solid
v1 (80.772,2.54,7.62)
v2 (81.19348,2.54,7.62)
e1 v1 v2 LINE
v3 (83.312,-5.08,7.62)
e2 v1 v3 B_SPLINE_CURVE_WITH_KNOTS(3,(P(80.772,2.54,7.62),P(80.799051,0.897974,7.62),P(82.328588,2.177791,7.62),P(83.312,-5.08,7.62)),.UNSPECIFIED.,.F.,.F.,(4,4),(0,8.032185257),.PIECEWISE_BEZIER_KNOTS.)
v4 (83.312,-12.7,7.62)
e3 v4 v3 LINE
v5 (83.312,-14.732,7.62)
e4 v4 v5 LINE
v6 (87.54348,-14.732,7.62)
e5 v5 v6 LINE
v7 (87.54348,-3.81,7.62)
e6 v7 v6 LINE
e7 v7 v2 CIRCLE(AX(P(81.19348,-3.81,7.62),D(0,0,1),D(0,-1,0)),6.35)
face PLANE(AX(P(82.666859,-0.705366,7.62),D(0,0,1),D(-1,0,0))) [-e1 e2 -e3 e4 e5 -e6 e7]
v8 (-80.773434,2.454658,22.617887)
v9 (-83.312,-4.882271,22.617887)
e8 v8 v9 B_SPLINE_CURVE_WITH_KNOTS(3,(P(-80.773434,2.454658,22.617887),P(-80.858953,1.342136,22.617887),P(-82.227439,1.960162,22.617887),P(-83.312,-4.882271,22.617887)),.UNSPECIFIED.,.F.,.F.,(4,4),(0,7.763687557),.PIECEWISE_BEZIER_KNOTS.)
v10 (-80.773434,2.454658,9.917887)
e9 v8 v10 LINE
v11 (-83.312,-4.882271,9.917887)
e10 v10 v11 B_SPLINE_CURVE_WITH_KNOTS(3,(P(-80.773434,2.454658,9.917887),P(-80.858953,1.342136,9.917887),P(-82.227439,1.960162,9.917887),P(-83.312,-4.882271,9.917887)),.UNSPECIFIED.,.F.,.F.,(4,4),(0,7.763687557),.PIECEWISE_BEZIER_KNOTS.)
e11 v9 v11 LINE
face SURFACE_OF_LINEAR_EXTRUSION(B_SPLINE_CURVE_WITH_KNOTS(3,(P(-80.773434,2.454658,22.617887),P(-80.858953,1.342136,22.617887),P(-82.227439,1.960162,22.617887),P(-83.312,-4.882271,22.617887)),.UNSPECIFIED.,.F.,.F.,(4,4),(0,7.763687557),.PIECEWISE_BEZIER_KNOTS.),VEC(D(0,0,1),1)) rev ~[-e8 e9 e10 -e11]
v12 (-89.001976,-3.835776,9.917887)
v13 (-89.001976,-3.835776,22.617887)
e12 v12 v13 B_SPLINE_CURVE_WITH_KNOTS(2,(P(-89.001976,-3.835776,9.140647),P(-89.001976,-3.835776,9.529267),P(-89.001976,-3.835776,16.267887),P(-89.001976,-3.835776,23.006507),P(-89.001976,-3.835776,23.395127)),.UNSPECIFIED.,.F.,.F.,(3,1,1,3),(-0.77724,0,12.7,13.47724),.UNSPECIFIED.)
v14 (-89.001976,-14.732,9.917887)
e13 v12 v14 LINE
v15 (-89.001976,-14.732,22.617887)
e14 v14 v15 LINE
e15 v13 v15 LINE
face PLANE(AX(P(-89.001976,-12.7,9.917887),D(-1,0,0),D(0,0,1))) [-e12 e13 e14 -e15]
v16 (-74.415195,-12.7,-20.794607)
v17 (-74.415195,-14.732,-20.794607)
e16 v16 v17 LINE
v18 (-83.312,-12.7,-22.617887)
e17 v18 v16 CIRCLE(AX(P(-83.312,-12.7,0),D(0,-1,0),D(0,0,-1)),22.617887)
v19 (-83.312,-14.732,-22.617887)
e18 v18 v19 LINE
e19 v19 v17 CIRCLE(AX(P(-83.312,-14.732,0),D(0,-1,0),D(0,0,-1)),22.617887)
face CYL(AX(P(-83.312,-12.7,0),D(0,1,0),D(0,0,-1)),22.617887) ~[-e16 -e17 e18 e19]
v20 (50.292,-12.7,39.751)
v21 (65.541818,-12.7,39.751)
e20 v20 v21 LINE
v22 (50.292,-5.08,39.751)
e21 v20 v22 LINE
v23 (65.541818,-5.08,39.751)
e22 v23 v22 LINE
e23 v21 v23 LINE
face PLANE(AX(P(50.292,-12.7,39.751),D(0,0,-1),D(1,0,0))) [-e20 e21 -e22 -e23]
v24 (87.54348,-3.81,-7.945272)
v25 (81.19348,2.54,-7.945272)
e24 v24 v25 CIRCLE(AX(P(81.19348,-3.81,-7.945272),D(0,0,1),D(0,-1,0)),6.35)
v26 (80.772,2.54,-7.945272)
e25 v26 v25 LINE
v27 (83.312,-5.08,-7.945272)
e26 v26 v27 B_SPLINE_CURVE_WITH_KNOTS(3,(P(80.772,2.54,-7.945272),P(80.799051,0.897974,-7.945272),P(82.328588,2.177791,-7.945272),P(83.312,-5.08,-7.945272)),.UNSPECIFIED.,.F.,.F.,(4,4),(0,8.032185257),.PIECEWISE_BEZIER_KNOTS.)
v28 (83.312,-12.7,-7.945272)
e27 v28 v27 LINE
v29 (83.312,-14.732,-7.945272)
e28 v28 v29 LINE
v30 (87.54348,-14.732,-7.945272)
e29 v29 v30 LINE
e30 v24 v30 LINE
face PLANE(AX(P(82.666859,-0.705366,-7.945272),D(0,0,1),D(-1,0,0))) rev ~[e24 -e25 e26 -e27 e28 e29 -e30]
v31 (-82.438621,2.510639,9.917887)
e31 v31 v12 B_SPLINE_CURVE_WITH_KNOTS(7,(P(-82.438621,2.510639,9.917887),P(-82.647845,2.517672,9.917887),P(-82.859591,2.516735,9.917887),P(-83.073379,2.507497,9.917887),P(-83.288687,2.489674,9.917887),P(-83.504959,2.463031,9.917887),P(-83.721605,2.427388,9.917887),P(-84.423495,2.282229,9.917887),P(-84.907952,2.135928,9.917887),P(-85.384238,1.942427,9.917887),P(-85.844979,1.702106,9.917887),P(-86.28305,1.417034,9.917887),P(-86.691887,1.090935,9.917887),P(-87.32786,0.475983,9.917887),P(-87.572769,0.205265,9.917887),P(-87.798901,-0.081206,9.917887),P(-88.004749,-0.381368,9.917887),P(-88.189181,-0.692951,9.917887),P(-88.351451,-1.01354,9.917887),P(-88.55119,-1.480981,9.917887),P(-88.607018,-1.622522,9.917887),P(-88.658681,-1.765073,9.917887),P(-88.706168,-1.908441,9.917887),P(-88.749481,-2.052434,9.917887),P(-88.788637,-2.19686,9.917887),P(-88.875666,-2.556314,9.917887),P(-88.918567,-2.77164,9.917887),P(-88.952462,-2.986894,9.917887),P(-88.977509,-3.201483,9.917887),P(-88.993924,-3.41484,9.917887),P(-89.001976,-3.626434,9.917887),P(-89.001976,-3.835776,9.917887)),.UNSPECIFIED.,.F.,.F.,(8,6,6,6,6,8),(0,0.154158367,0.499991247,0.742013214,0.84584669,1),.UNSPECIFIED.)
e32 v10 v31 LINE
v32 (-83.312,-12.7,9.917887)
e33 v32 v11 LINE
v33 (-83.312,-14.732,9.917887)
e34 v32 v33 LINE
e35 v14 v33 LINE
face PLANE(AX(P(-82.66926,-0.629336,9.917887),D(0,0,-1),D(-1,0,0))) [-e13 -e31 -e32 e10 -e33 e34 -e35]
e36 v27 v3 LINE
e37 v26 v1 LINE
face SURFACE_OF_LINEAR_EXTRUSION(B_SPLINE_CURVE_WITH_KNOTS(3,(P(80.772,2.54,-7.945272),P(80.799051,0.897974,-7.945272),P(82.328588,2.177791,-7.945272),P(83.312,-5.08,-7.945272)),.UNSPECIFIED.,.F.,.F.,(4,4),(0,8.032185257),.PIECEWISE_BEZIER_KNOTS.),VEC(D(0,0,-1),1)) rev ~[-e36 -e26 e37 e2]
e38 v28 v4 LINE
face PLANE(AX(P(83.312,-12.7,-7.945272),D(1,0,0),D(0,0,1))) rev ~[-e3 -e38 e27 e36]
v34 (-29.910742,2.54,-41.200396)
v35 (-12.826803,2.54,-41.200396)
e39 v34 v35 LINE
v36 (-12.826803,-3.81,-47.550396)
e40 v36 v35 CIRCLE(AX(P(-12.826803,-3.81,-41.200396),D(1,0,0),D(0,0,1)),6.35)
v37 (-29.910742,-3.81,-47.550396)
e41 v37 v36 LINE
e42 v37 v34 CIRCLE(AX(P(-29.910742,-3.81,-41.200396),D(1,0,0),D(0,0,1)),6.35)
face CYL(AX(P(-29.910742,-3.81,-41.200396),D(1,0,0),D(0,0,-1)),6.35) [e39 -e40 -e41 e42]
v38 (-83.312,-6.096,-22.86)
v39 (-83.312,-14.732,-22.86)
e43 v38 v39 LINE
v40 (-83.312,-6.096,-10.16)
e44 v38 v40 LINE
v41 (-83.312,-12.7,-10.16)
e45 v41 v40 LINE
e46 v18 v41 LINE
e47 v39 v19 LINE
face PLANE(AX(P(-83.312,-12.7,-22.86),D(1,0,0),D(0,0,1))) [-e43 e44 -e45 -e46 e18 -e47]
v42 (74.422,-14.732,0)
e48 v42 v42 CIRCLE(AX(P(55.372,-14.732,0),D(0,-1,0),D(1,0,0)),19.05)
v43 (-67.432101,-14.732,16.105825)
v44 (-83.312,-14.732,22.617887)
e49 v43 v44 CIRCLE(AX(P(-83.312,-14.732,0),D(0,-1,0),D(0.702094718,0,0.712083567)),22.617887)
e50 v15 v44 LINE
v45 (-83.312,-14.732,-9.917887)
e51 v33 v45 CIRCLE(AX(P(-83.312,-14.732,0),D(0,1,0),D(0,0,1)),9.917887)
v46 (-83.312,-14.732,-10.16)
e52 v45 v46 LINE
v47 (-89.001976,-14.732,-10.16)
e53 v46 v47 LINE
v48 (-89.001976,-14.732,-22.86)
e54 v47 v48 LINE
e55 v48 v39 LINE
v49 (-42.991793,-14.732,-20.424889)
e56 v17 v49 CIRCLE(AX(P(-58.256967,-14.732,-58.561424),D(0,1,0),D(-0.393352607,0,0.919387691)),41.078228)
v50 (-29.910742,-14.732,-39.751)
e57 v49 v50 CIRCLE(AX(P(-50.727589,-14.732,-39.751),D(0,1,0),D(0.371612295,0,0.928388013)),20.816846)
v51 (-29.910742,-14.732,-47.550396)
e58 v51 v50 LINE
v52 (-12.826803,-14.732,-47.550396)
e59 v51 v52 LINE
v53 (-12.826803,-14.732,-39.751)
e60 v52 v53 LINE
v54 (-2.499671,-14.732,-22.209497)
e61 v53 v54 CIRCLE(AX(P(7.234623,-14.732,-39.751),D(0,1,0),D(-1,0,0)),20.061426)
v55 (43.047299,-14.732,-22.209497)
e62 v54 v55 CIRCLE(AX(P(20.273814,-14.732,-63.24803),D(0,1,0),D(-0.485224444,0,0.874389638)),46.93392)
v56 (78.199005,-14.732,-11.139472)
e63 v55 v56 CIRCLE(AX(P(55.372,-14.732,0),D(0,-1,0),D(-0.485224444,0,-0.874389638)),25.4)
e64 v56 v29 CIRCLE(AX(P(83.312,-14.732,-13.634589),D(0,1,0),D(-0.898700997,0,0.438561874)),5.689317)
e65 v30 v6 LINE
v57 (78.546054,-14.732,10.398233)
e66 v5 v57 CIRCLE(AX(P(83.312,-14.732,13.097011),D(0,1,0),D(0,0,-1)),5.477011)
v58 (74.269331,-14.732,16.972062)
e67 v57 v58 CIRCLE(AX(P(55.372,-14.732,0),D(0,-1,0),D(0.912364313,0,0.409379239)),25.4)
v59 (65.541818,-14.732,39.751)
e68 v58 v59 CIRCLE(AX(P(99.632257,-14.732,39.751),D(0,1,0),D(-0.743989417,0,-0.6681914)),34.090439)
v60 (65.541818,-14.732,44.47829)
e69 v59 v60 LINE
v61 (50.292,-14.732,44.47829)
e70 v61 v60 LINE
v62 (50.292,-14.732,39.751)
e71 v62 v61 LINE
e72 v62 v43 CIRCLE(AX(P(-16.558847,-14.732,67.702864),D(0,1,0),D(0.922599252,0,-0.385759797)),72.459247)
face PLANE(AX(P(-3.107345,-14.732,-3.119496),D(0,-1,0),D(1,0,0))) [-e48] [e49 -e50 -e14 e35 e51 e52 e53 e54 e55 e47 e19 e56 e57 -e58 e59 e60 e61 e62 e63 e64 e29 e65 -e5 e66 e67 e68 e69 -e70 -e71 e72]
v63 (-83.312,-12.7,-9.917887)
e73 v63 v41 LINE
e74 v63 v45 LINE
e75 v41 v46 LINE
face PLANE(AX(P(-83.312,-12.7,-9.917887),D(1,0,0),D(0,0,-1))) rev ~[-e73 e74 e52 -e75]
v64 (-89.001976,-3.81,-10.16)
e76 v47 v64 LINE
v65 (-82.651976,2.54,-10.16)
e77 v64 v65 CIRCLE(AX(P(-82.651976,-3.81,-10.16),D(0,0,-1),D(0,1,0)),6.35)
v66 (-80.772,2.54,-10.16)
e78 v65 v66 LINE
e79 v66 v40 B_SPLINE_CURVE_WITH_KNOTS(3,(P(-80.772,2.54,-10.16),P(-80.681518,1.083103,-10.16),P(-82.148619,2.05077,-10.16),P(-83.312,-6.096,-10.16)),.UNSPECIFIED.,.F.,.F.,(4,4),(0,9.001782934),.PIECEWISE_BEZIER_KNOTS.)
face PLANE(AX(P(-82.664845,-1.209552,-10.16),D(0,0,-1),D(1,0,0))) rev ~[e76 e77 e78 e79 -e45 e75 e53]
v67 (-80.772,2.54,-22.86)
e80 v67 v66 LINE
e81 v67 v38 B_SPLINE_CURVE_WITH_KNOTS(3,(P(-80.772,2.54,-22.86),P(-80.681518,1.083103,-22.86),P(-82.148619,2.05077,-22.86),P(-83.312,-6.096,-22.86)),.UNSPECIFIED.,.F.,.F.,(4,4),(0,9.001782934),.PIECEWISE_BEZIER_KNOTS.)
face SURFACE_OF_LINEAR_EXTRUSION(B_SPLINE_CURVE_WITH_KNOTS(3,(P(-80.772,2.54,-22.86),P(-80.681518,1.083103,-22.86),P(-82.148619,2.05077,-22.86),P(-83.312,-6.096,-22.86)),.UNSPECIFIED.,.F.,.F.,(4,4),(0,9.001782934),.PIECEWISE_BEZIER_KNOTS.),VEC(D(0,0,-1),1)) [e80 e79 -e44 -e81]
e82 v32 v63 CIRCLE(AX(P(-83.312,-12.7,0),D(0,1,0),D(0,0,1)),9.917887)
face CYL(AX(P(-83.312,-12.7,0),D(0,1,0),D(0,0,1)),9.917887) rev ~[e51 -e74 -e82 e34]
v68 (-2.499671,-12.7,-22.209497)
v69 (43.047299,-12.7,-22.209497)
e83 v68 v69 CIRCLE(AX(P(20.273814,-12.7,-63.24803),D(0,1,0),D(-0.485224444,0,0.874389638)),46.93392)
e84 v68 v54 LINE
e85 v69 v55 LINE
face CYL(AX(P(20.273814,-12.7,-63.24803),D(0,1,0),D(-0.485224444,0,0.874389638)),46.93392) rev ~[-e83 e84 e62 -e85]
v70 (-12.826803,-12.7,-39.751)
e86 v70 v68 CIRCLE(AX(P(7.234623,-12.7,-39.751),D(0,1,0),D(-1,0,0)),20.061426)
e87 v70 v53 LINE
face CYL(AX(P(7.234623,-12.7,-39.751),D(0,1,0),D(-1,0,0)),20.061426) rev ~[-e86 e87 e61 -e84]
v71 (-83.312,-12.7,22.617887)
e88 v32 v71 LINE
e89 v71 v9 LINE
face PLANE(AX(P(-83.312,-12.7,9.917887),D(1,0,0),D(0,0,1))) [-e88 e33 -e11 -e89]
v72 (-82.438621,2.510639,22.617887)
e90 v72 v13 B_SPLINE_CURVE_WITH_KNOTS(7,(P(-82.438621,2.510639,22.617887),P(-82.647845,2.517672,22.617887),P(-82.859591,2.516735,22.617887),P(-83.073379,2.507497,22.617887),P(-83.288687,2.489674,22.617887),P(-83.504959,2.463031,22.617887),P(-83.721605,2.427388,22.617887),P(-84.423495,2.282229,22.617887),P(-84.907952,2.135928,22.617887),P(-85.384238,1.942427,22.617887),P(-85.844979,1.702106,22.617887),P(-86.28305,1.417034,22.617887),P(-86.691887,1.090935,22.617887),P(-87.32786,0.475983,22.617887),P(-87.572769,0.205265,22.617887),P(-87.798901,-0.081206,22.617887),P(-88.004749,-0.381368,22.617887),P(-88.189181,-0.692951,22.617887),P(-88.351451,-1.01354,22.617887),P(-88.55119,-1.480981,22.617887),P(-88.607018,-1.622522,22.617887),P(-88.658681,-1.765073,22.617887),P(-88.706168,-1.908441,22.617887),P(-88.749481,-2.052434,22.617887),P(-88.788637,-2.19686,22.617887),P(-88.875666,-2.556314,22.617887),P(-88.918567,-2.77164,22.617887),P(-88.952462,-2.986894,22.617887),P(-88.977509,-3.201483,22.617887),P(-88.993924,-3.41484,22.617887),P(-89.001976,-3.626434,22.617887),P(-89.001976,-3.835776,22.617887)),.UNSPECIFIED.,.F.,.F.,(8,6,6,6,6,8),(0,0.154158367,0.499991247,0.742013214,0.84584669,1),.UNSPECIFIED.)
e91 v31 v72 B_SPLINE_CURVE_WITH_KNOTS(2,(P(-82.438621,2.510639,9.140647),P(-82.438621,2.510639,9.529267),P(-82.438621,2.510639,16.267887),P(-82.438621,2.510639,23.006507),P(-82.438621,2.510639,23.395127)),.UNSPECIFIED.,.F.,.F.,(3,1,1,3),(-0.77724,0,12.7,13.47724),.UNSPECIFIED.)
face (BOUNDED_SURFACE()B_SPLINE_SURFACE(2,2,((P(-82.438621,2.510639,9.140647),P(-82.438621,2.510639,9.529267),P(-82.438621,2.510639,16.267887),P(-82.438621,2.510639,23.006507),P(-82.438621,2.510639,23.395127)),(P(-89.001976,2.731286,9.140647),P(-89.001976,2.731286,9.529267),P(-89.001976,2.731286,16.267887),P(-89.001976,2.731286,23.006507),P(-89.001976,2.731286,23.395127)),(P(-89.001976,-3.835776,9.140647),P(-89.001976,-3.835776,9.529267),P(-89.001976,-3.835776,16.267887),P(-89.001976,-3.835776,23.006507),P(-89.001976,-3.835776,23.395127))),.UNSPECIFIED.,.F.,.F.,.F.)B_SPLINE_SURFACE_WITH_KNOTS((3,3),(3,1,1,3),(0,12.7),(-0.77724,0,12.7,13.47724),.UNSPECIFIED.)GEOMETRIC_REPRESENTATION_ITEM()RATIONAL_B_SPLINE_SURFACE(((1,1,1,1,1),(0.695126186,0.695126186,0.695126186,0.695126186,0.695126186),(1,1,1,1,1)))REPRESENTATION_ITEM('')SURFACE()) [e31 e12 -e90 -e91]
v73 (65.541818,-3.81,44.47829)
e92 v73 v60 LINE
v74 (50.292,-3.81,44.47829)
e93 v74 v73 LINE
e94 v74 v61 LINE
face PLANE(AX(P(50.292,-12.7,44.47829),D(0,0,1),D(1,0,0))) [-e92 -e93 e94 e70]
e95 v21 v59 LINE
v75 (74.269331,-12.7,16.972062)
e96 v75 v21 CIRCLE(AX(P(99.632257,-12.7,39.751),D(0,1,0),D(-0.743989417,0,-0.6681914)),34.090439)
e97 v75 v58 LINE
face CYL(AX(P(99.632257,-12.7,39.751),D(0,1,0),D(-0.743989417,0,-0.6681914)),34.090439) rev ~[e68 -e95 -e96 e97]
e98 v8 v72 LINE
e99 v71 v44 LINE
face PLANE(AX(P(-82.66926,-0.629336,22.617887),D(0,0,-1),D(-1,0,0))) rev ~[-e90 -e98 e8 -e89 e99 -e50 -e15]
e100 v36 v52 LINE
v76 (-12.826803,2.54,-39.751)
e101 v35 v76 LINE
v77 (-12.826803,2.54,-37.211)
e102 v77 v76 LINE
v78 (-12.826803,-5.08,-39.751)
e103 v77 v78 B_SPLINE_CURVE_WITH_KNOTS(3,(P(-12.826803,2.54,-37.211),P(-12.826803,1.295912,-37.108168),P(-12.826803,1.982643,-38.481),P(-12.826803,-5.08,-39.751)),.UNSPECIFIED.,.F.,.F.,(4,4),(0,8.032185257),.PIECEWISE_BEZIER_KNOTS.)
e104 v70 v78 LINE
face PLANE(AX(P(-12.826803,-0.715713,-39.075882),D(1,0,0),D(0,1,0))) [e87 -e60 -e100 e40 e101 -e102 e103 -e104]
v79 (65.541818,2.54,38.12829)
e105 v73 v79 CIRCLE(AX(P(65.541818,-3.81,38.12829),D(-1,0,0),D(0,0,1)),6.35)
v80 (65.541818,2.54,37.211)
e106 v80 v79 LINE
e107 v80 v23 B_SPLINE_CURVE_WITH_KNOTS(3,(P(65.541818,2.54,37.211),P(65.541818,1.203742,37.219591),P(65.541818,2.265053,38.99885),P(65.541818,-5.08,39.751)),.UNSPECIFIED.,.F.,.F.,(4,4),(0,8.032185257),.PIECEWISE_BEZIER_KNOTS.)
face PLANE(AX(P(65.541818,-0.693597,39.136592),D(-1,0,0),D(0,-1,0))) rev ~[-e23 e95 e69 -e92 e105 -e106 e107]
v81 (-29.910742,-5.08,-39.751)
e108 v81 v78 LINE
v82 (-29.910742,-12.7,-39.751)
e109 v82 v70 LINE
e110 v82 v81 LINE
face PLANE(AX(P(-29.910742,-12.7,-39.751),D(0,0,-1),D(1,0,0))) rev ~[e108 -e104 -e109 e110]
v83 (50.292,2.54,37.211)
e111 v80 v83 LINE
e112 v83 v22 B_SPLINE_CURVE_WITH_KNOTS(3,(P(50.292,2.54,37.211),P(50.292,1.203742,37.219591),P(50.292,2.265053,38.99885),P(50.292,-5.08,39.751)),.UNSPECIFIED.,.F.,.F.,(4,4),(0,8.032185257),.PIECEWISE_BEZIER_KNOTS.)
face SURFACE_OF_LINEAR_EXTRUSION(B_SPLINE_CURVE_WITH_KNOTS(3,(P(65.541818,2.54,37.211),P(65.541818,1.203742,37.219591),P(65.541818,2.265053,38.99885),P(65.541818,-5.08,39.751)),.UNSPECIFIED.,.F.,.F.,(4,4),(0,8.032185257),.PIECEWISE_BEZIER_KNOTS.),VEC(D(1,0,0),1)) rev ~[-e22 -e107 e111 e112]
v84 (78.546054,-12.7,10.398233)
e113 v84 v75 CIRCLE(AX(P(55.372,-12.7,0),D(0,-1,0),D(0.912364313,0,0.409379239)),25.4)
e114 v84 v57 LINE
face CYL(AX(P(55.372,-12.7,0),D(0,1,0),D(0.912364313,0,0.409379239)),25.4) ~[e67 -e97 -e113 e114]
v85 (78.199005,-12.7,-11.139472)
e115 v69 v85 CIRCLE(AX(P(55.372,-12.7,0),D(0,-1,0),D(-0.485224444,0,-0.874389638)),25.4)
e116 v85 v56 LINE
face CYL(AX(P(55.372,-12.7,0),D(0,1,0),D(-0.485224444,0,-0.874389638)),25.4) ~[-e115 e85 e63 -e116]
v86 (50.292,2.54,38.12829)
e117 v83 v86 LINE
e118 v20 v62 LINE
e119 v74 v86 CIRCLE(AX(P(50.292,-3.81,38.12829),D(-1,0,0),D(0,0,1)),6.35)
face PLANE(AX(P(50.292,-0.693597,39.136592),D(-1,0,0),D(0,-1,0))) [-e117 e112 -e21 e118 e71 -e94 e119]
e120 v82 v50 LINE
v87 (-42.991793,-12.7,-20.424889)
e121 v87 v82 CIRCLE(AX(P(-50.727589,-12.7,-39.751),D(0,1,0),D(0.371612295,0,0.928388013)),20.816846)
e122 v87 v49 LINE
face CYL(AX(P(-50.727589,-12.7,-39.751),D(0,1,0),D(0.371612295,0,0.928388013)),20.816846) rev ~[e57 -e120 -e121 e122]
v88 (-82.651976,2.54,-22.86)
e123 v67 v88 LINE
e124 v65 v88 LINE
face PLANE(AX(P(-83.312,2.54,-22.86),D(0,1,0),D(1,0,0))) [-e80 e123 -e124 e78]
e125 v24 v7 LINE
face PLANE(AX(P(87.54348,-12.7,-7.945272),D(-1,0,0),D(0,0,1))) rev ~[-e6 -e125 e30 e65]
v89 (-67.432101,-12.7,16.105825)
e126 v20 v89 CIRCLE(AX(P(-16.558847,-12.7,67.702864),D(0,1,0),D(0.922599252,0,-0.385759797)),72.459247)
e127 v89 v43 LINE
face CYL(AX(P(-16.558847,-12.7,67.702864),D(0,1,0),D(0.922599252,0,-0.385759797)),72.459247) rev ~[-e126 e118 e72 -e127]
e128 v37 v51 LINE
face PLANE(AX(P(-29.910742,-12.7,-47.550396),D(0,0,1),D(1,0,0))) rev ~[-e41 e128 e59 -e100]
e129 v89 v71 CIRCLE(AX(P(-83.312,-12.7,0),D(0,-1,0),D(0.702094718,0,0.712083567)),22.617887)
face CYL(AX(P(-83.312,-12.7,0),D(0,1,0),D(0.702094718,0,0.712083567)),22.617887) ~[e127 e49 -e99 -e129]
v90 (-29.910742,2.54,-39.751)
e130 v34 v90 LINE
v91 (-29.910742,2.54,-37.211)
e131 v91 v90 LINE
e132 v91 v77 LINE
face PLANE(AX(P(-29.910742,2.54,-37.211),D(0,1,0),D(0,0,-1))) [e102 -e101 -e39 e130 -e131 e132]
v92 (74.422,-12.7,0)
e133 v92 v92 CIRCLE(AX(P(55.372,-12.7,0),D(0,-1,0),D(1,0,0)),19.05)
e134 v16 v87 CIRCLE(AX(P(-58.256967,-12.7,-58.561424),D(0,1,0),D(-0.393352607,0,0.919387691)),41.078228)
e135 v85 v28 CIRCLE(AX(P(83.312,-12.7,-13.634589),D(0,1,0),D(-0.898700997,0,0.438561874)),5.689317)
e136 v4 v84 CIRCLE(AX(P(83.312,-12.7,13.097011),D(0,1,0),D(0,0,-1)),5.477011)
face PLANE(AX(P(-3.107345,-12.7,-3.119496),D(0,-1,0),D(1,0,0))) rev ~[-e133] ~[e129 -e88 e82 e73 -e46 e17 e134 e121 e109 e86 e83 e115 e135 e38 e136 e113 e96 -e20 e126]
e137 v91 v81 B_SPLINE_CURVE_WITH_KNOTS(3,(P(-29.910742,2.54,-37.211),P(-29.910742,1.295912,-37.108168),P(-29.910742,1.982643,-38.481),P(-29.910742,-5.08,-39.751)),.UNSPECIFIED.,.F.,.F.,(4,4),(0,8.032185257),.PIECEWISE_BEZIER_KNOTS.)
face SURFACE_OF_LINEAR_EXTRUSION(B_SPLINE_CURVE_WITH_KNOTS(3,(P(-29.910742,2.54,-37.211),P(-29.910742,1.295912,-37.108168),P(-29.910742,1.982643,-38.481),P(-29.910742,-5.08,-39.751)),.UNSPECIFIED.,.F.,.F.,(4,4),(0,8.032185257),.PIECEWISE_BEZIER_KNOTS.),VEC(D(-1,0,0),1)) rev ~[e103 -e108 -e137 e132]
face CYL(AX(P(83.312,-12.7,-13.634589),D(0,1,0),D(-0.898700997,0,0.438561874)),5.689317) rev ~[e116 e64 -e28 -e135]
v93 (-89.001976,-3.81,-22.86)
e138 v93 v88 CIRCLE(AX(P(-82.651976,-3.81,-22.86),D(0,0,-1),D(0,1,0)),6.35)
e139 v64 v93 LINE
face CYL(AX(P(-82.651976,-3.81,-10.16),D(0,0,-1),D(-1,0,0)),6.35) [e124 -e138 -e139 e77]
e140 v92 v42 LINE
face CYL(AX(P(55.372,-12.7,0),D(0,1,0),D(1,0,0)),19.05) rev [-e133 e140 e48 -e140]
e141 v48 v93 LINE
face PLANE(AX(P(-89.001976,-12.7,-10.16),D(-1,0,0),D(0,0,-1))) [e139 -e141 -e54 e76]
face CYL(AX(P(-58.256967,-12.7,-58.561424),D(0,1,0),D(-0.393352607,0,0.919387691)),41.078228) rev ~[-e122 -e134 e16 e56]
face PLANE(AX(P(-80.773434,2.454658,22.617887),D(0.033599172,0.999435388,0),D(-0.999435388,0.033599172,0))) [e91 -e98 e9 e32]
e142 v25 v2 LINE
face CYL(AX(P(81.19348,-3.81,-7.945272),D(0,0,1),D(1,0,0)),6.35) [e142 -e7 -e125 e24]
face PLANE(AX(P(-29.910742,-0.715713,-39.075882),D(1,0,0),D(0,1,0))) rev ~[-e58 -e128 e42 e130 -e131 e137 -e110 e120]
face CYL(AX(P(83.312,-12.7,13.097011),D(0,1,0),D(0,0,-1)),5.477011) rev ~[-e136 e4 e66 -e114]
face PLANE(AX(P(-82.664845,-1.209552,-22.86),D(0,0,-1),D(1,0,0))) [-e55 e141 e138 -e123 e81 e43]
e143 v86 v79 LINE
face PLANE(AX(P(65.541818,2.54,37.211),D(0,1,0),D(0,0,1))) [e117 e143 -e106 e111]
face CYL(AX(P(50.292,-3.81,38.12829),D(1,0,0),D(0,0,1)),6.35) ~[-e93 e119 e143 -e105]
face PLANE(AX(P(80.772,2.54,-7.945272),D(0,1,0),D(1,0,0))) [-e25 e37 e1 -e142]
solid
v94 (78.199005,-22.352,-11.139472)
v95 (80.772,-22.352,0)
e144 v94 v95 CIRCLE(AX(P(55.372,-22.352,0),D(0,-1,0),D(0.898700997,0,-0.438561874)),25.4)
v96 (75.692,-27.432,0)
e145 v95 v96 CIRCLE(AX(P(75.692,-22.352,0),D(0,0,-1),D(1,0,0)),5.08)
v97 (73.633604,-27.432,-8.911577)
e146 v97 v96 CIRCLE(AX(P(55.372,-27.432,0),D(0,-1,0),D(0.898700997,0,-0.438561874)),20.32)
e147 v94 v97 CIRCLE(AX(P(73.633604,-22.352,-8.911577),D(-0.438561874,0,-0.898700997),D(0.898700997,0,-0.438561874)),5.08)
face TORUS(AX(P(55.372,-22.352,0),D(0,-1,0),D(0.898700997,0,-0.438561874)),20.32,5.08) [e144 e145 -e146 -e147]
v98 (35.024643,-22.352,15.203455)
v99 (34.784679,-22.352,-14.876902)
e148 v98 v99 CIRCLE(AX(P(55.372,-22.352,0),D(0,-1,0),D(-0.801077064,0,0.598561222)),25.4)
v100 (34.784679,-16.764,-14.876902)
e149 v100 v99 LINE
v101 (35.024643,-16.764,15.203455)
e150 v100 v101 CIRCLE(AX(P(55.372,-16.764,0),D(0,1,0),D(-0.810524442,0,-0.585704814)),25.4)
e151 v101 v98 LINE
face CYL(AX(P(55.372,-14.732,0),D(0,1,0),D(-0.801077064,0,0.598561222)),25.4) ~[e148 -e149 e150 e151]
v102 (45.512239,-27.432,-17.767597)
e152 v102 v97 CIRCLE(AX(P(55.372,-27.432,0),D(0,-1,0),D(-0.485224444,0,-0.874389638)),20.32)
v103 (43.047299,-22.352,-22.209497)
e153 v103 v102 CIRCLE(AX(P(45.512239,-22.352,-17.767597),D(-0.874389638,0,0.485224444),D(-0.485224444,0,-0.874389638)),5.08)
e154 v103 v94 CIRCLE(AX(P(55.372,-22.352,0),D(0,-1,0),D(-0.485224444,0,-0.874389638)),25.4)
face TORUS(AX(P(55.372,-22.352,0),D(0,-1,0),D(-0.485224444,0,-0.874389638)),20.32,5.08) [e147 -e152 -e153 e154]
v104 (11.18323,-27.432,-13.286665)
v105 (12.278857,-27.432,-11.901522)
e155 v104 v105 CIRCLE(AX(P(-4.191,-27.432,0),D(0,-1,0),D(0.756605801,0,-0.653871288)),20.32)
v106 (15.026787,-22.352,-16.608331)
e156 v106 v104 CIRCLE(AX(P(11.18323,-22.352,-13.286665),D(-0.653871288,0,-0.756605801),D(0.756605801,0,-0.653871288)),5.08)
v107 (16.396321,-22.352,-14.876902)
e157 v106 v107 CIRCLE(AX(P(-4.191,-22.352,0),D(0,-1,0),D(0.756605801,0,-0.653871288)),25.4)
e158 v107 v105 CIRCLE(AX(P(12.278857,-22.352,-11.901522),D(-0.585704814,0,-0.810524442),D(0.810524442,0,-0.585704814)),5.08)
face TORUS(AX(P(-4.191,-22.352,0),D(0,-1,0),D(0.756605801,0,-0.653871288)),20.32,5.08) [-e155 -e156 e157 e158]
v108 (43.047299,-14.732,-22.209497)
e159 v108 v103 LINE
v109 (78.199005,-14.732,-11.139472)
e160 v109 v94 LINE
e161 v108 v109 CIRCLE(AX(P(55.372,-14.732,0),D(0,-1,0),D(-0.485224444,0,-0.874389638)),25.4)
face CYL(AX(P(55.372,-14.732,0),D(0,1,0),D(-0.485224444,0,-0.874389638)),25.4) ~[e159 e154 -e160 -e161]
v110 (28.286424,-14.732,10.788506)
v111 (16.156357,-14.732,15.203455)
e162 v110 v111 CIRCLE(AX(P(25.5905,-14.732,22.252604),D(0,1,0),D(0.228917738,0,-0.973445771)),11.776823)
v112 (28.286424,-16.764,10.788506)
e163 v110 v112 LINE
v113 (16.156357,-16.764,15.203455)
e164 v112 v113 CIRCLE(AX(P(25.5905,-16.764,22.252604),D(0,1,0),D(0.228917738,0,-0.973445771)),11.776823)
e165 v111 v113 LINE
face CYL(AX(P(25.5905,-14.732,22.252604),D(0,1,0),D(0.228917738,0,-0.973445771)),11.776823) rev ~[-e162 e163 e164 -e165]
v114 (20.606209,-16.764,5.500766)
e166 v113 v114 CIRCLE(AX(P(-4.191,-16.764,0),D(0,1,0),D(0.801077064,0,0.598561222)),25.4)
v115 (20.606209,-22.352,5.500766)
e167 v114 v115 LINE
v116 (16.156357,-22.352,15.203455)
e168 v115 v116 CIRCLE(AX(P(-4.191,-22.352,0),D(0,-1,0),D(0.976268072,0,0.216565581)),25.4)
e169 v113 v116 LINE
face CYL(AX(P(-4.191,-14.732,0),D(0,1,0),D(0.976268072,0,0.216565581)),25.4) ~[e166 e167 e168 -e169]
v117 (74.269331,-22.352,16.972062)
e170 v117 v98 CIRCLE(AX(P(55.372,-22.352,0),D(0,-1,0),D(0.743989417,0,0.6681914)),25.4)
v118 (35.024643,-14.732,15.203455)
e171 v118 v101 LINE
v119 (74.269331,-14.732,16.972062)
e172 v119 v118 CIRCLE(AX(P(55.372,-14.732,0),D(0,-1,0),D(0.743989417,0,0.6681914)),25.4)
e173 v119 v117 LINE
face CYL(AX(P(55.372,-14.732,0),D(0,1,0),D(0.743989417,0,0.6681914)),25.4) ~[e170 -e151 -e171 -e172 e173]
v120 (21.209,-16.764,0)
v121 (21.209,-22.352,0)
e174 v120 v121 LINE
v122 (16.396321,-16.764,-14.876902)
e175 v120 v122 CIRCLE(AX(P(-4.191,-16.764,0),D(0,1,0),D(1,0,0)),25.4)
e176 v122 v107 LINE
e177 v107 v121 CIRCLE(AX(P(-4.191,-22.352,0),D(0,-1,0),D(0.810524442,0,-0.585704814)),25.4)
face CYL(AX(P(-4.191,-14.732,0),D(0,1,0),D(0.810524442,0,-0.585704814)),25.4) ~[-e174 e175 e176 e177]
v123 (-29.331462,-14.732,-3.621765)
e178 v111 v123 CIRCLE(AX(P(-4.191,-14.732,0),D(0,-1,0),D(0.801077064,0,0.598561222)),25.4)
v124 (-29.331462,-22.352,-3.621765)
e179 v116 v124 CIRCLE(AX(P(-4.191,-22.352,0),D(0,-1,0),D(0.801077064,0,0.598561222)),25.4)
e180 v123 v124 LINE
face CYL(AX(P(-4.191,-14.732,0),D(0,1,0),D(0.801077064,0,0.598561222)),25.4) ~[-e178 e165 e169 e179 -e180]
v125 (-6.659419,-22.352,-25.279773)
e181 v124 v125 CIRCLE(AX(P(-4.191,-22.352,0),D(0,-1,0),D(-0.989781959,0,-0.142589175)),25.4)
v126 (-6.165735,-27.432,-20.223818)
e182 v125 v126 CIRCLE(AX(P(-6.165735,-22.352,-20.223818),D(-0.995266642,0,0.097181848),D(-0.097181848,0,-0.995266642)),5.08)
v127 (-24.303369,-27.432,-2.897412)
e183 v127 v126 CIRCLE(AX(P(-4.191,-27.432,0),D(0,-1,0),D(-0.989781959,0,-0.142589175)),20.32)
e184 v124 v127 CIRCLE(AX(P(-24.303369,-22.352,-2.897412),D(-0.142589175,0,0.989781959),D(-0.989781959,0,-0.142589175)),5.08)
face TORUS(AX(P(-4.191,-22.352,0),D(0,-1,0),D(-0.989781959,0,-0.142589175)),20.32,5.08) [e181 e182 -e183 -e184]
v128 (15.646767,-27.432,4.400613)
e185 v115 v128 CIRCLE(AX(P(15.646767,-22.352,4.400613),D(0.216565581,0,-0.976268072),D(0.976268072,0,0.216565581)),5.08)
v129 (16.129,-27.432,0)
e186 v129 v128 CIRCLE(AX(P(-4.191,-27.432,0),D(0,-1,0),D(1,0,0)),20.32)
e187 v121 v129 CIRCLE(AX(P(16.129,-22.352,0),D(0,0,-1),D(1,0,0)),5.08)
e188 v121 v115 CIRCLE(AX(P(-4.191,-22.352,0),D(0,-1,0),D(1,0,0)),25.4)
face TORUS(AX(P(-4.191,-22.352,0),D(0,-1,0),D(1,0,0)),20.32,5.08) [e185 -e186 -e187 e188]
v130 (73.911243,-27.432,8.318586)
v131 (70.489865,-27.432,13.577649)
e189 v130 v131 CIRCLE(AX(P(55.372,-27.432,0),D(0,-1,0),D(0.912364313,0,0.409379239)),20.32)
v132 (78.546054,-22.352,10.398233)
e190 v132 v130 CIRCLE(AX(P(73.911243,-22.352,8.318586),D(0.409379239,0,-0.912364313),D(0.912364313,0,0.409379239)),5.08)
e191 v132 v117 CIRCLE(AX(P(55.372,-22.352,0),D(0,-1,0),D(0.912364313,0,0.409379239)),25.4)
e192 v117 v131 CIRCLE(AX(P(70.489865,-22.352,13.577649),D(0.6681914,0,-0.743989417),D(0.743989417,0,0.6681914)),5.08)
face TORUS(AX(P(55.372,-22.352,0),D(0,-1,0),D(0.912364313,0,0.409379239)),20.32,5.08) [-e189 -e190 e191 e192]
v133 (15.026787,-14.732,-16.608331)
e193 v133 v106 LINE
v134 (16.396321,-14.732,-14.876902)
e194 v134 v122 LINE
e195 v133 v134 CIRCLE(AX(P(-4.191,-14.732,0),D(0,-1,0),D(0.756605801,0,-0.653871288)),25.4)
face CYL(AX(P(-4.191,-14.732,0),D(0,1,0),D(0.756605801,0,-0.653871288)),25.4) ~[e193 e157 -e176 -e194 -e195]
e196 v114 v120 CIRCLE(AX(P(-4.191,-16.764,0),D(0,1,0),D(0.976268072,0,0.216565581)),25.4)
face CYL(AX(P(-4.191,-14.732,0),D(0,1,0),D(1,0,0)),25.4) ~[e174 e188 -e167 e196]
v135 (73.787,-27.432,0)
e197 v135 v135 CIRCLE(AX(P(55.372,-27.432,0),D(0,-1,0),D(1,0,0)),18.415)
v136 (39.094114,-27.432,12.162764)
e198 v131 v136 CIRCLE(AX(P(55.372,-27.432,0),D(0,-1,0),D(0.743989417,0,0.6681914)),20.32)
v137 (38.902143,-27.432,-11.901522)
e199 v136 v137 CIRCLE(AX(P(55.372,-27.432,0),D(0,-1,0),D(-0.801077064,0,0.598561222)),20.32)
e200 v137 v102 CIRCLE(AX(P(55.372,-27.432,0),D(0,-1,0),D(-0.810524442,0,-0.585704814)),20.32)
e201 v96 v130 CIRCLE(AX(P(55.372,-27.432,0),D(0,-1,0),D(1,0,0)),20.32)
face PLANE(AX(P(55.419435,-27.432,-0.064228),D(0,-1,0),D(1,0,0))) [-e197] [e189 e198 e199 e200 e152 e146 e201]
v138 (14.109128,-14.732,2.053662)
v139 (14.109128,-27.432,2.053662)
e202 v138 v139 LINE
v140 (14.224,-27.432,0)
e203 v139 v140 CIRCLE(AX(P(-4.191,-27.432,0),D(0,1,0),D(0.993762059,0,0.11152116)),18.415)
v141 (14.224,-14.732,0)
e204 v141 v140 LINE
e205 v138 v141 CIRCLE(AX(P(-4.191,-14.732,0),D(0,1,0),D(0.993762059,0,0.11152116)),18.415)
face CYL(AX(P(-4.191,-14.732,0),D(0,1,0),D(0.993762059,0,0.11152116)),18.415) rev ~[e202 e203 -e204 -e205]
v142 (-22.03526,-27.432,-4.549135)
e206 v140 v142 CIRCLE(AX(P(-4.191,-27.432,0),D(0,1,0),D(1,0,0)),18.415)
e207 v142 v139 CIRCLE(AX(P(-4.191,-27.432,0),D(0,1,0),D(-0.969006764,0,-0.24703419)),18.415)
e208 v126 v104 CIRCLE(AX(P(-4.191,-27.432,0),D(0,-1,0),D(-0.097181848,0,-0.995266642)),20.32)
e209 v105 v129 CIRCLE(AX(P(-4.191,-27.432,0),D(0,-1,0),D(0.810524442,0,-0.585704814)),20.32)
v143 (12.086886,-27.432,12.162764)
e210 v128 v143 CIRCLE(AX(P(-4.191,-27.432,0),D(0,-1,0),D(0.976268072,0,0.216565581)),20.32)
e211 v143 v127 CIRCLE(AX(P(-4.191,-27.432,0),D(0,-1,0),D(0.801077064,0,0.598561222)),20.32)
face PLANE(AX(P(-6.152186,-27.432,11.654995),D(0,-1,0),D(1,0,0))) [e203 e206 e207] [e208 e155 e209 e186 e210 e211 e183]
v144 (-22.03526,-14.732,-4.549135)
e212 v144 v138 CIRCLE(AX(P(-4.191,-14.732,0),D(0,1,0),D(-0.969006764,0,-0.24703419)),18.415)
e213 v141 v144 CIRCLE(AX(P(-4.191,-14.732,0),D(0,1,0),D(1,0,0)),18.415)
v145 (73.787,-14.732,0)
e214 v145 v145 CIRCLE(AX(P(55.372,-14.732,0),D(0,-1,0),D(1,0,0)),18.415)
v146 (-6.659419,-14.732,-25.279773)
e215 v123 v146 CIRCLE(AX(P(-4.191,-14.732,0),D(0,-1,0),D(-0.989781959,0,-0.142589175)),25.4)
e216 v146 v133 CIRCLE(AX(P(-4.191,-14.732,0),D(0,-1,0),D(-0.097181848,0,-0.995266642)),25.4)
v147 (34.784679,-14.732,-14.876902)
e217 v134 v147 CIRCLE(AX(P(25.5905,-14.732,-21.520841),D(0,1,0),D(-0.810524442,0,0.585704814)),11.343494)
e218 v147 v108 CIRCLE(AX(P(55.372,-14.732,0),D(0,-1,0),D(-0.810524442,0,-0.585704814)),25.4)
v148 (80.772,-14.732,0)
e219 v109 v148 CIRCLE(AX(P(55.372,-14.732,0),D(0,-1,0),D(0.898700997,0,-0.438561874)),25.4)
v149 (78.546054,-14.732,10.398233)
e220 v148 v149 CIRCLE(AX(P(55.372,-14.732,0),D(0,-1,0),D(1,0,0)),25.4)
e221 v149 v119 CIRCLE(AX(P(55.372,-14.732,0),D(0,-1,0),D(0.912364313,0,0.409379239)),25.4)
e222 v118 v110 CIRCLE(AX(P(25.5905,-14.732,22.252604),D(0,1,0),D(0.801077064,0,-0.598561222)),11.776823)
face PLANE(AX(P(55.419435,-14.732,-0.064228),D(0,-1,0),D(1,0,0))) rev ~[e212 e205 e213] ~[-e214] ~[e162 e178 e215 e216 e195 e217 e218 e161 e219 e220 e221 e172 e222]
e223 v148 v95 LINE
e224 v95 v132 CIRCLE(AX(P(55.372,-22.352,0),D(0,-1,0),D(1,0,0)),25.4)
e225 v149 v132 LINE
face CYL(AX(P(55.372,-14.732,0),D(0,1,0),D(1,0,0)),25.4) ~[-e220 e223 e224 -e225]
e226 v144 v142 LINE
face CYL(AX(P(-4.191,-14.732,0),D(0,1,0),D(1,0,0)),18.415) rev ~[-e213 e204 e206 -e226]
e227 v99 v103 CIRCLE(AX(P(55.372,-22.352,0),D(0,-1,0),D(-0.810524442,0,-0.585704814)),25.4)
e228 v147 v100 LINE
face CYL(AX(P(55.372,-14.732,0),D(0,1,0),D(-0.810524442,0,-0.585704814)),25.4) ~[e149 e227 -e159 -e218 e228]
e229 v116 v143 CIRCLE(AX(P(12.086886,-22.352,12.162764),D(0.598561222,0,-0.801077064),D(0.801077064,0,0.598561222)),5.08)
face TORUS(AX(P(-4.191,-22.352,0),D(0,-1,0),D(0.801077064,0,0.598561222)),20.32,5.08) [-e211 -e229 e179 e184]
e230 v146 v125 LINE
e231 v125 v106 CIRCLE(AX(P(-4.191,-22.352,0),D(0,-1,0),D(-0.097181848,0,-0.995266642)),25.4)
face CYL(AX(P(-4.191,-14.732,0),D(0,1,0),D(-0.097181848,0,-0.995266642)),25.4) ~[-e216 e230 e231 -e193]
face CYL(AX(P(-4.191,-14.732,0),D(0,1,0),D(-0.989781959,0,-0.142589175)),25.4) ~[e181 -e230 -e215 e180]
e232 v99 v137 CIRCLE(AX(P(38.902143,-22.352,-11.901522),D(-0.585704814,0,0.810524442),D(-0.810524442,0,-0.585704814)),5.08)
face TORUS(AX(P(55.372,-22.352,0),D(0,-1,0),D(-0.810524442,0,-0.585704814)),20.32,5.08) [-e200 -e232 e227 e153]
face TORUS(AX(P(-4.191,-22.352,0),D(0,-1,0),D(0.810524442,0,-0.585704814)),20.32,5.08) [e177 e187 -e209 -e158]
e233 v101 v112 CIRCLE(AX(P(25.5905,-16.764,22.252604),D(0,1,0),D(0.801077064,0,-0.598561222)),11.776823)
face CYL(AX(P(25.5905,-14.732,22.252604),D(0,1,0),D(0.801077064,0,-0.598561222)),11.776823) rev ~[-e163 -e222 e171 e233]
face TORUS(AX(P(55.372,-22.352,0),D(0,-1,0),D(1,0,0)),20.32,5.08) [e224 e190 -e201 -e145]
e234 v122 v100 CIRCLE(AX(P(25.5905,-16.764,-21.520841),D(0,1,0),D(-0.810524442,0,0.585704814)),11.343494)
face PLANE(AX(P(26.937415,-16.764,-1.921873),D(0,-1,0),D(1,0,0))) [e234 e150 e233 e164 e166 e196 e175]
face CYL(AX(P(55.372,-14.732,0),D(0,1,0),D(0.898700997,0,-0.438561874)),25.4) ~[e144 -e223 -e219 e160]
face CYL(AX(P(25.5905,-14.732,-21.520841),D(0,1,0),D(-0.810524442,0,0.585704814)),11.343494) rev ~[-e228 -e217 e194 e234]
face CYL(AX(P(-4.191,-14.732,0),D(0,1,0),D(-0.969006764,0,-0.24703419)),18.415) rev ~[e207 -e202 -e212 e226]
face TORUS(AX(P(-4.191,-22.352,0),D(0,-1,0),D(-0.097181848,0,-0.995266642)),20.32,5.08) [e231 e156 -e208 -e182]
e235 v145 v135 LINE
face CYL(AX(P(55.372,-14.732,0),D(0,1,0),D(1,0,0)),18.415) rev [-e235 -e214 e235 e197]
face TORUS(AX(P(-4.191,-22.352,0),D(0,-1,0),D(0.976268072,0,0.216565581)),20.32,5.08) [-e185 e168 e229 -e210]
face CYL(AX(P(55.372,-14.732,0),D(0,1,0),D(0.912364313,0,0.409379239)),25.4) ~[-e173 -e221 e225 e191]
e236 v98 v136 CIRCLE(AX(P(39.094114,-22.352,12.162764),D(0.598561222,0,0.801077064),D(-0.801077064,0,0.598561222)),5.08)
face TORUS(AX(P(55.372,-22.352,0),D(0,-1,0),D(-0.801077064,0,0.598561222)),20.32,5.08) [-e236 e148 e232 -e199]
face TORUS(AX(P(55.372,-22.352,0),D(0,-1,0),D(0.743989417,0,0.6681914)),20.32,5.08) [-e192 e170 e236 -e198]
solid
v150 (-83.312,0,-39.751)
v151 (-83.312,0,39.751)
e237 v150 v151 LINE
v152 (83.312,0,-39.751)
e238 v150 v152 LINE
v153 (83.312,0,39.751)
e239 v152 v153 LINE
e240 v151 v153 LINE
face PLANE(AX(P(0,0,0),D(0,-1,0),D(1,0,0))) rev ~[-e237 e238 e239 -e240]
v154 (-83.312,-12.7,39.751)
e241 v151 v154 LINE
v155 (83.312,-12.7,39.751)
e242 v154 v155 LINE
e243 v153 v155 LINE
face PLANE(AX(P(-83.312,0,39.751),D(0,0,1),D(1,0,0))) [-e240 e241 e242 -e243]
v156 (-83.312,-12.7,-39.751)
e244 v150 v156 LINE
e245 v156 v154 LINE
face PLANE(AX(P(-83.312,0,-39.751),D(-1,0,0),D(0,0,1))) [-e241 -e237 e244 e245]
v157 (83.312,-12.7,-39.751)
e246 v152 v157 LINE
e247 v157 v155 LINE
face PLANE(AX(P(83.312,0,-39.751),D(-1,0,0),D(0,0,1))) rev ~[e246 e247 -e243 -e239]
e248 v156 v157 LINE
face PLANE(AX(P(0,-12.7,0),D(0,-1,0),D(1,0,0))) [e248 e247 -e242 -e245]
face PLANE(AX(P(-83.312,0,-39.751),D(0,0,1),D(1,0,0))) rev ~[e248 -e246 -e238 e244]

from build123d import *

# Parameters (mm, degrees)
F0_W      = 166.624
F0_H      = 79.502
F1_DEPTH  = 12.7
F3_R      = 19.05
F3_W      = 15.2498179367
F3_H      = 4.727289783
F3_W_2    = 4.2314800982
F3_H_2    = 15.5652722449
F3_W_3    = 17.0839390975
F3_H_3    = 7.7993963947
F3_W_4    = 5.6899759536
F3_H_4    = 12.7
F4_DEPTH  = 2.032
F5_DEPTH  = 15.24
F7_DEPTH  = 15.2498179367
F9_DEPTH  = 15.5652722449
F11_DEPTH = 17.0839390975
F13_DEPTH = 12.7
F15_DEPTH = 12.7
F16_R     = 6.35
F18_DEPTH = 2.032
F17_R     = 19.05
F17_R_2   = 18.415
F19_DEPTH = 12.7
F20_R     = 5.08


# Not quite as in the source:
# - a feature of the source that left no trace in its solid (it failed there, or was rolled back) is left out


with BuildPart() as f1:
    # F0 (on Front) → F1 (new body)
    with BuildSketch(Plane.XZ):
        Rectangle(F0_W, F0_H)
    extrude(amount=F1_DEPTH)


with BuildPart() as f4:
    # F3 (on face) → F4 (new body)
    with BuildSketch(Plane.XZ.offset(12.7)):
        with BuildLine():
            Line((83.312, -7.9452722449), (83.312, 7.62))
            ThreePointArc((83.312, 7.62), (80.5537024075, 8.3652624791), (78.5460535381, 10.3982326679))
            ThreePointArc((78.5460535381, 10.3982326679), (76.662940796, 13.8512035585), (74.2693311981, 16.9720615598))
            ThreePointArc((74.2693311981, 16.9720615598), (67.7983810803, 27.5541815195), (65.5418179367, 39.751))
            Line((65.5418179367, 39.751), (50.292, 39.751))
            ThreePointArc((50.292, 39.751), (-2.2901946449, -3.3376030905), (-67.4321012743, 16.1058253792))
            ThreePointArc((-67.4321012743, 16.1058253792), (-74.7303608062, 20.9266400417), (-83.312, 22.6178866096))
            Line((-83.312, 22.6178866096), (-83.312, 9.9178866096))
            ThreePointArc((-83.312, 9.9178866096), (-73.3941133904, 0), (-83.312, -9.9178866096))
            Line((-83.312, -9.9178866096), (-83.312, -10.16))
            Line((-83.312, -10.16), (-83.312, -22.6178866096))
            ThreePointArc((-83.312, -22.6178866096), (-78.7711442585, -22.1573785413), (-74.4151953336, -20.7946065463))
            ThreePointArc((-74.4151953336, -20.7946065463), (-58.7402465196, -17.4860386913), (-42.9917926654, -20.424889278))
            ThreePointArc((-42.9917926654, -20.424889278), (-33.4884475886, -28.0825335776), (-29.9107422883, -39.751))
            Line((-29.9107422883, -39.751), (-12.8268031908, -39.751))
            ThreePointArc((-12.8268031908, -39.751), (-10.0533012351, -29.573156585), (-2.4996713636, -22.2094967991))
            ThreePointArc((-2.4996713636, -22.2094967991), (20.2738138752, -16.3141101101), (43.0472991139, -22.2094967991))
            ThreePointArc((43.0472991139, -22.2094967991), (63.0016110107, -24.2270310981), (78.1990053344, -11.1394715972))
            ThreePointArc((78.1990053344, -11.1394715972), (80.2976334018, -8.8094548883), (83.312, -7.9452722449))
        make_face()
        with Locations((55.372, 0)):
            Circle(F3_R, mode=Mode.SUBTRACT)
        with Locations((57.9169089684, 42.1146448915)):
            Rectangle(F3_W, F3_H)
        with Locations((85.4277400491, -0.1626361225)):
            Rectangle(F3_W_2, F3_H_2)
        with Locations((-21.3687727395, -43.6506981973)):
            Rectangle(F3_W_3, F3_H_3)
        Polygon((-89.0019759536, -22.86), (-83.312, -22.86), (-83.312, -22.6178866096), (-83.312, -10.16), (-89.0019759536, -10.16), align=None)
        with Locations((-86.1569879768, 16.2678866096)):
            Rectangle(F3_W_4, F3_H_4)
    extrude(amount=F4_DEPTH)

    # F3 (on face) → F5 (join)
    with BuildSketch(Plane.XZ.offset(12.7)):
        Polygon((-89.0019759536, -22.86), (-83.312, -22.86), (-83.312, -22.6178866096), (-83.312, -10.16), (-89.0019759536, -10.16), align=None)
        with Locations((-86.1569879768, 16.2678866096)):
            Rectangle(F3_W_4, F3_H_4)
        with Locations((-21.3687727395, -43.6506981973)):
            Rectangle(F3_W_3, F3_H_3)
        with Locations((57.9169089684, 42.1146448915)):
            Rectangle(F3_W, F3_H)
        with Locations((85.4277400491, -0.1626361225)):
            Rectangle(F3_W_2, F3_H_2)
    extrude(amount=-F5_DEPTH)

    # F6 (on face) → F7 (join, through all)
    with BuildSketch(Plane.YZ.offset(65.5418179367)):
        with BuildLine():
            add(Edge.make_bspline(
                [(2.54, 37.211), (1.2037418783, 37.2195914388), (2.2650531027, 38.99884969), (-5.08, 39.751)],
                knots=[0, 0, 0, 0, 8.0321852568, 8.0321852568, 8.0321852568, 8.0321852568], degree=3))
            Line((2.54, 37.211), (2.54, 39.751))
            Line((2.54, 39.751), (-5.08, 39.751))
        make_face()
    extrude(amount=-F7_DEPTH)

    # F8 (on face) → F9 (join, through all)
    with BuildSketch(Plane(origin=(0, 0, -7.9452722449), x_dir=(1, 0, 0), z_dir=(0, 0, -1))):
        with BuildLine():
            add(Edge.make_bspline(
                [(80.772, -2.54), (80.7990506291, -0.8979742997), (82.3285877705, -2.1777907386), (83.312, 5.08)],
                knots=[0, 0, 0, 0, 8.0321852568, 8.0321852568, 8.0321852568, 8.0321852568], degree=3))
            Line((80.772, -2.54), (83.312, -2.54))
            Line((83.312, -2.54), (83.312, 5.08))
        make_face()
    extrude(amount=-F9_DEPTH)

    # F10 (on face) → F11 (join, through all)
    with BuildSketch(Plane(origin=(-29.9107422883, 0, 0), x_dir=(0, -1, 0), z_dir=(-1, 0, 0))):
        with BuildLine():
            add(Edge.make_bspline(
                [(-2.54, -37.211), (-1.2959121959, -37.1081680059), (-1.9826430362, -38.481), (5.08, -39.751)],
                knots=[0, 0, 0, 0, 8.0321852568, 8.0321852568, 8.0321852568, 8.0321852568], degree=3))
            Line((-2.54, -37.211), (-2.54, -39.751))
            Line((-2.54, -39.751), (5.08, -39.751))
        make_face()
    extrude(amount=-F11_DEPTH)

    # F12 (on face) → F13 (join, through all)
    with BuildSketch(Plane(origin=(0, 0, -22.86), x_dir=(1, 0, 0), z_dir=(0, 0, -1))):
        with BuildLine():
            Line((-83.312, -2.54), (-80.772, -2.54))
            add(Edge.make_bspline(
                [(-80.772, -2.54), (-80.6815177202, -1.0831034742), (-82.1486189961, -2.0507695153), (-83.312, 6.096)],
                knots=[0, 0, 0, 0, 9.0017829345, 9.0017829345, 9.0017829345, 9.0017829345], degree=3))
            Line((-83.312, 6.096), (-83.312, -2.54))
        make_face()
    extrude(amount=-F13_DEPTH)

    # F14 (on face) → F15 (join, through all)
    with BuildSketch(Plane.XY.offset(22.6178866096)):
        with BuildLine():
            add(Edge.make_bspline(
                [(-80.7734341134, 2.4546581032), (-80.8589532971, 1.342135598), (-82.2274386883, 1.9601618405), (-83.312, -4.8822709359)],
                knots=[0, 0, 0, 0, 7.7636875572, 7.7636875572, 7.7636875572, 7.7636875572], degree=3))
            Line((-80.7734341134, 2.4546581032), (-83.312, 2.54))
            Line((-83.312, 2.54), (-83.312, -4.7201365232))
            Line((-83.312, -4.7201365232), (-83.312, -4.8822709359))
        make_face()
    extrude(amount=-F15_DEPTH)

    # F16
    f16_edges = [f4.edges().sort_by_distance(p)[0] for p in [
        (-21.368773, 2.54, -47.550396),
        (-89.001976, 2.54, -16.51),
        (-89.001976, 2.54, 16.267887),
        (87.54348, 2.54, -0.162636),
        (57.916909, 2.54, 44.47829),
    ]]
    fillet(f16_edges, radius=F16_R)


with BuildPart() as f18:
    # F17 (on face) → F18 (new body)
    with BuildSketch(Plane.XZ.offset(14.732)):
        with BuildLine():
            ThreePointArc((28.2864236116, 10.7885061807), (24.5314617002, 8.0209659875), (20.6062090392, 5.5007657527))
            ThreePointArc((20.6062090392, 5.5007657527), (21.0578525442, 2.7668475206), (21.209, 0))
            ThreePointArc((21.209, 0), (19.9758983224, -7.8179936988), (16.3963208288, -14.876902268))
            ThreePointArc((16.3963208288, -14.876902268), (25.5905, -10.1773472949), (34.7846791712, -14.876902268))
            ThreePointArc((34.7846791712, -14.876902268), (29.972808178, 0.2026198097), (35.0246425652, 15.2034550488))
            ThreePointArc((35.0246425652, 15.2034550488), (32.0447675603, 12.4019200322), (28.2864236116, 10.7885061807))
        make_face()
        with BuildLine():
            ThreePointArc((16.1563574348, 15.2034550488), (18.8967351732, 10.5885071929), (20.6062090392, 5.5007657527))
            ThreePointArc((20.6062090392, 5.5007657527), (24.5314617002, 8.0209659875), (28.2864236116, 10.7885061807))
            ThreePointArc((28.2864236116, 10.7885061807), (21.5626169277, 11.1860010324), (16.1563574348, 15.2034550488))
        make_face()
    extrude(amount=F18_DEPTH)

    # F17 (on face) → F19 (join)
    with BuildSketch(Plane.XZ.offset(14.732)):
        with BuildLine():
            ThreePointArc((74.2693311981, 16.9720615598), (54.2284807525, 25.3742460722), (35.0246425652, 15.2034550488))
            ThreePointArc((35.0246425652, 15.2034550488), (29.972808178, 0.2026198097), (34.7846791712, -14.876902268))
            ThreePointArc((34.7846791712, -14.876902268), (38.5125210941, -18.99784122), (43.0472991139, -22.2094967991))
            ThreePointArc((43.0472991139, -22.2094967991), (63.0016110107, -24.2270310981), (78.1990053344, -11.1394715972))
            ThreePointArc((78.1990053344, -11.1394715972), (80.1203932357, -5.7163827945), (80.772, 0))
            ThreePointArc((80.772, 0), (80.209280043, 5.3169088827), (78.5460535381, 10.3982326679))
            ThreePointArc((78.5460535381, 10.3982326679), (76.662940796, 13.8512035585), (74.2693311981, 16.9720615598))
        make_face()
        with Locations((55.372, 0)):
            Circle(F17_R, mode=Mode.SUBTRACT)
        with Locations((55.372, 0)):
            Circle(F17_R)
        with Locations((55.372, 0)):
            Circle(F17_R_2, mode=Mode.SUBTRACT)
        with BuildLine():
            ThreePointArc((-22.0352595619, -4.5491346088), (-7.5002575265, 18.1152156935), (14.1091283255, 2.0536621604))
            ThreePointArc((14.1091283255, 2.0536621604), (17.4014337238, 3.6947258621), (20.6062090392, 5.5007657527))
            ThreePointArc((20.6062090392, 5.5007657527), (18.8967351732, 10.5885071929), (16.1563574348, 15.2034550488))
            ThreePointArc((16.1563574348, 15.2034550488), (-13.9039135762, 23.4695400437), (-29.3314617697, -3.6217650399))
            ThreePointArc((-29.3314617697, -3.6217650399), (-25.6951347151, -4.1780837077), (-22.0352595619, -4.5491346088))
        make_face()
        with BuildLine():
            ThreePointArc((14.1091283255, 2.0536621604), (14.1952596538, 1.0284361636), (14.224, 0))
            ThreePointArc((14.224, 0), (-1.8986011289, -18.2717577812), (-22.0352595619, -4.5491346088))
            ThreePointArc((-22.0352595619, -4.5491346088), (-25.6951347151, -4.1780837077), (-29.3314617697, -3.6217650399))
            ThreePointArc((-29.3314617697, -3.6217650399), (-21.7360818632, -18.3665484622), (-6.6594189467, -25.2797727028))
            ThreePointArc((-6.6594189467, -25.2797727028), (-4.678865898, -23.6100705511), (-2.4996713636, -22.2094967991))
            ThreePointArc((-2.4996713636, -22.2094967991), (5.9863881024, -18.5416288768), (15.0267873519, -16.6083307198))
            ThreePointArc((15.0267873519, -16.6083307198), (15.7303734577, -15.7575023262), (16.3963208288, -14.876902268))
            ThreePointArc((16.3963208288, -14.876902268), (19.9758983224, -7.8179936988), (21.209, 0))
            ThreePointArc((21.209, 0), (21.0578525442, 2.7668475206), (20.6062090392, 5.5007657527))
            ThreePointArc((20.6062090392, 5.5007657527), (17.4014337238, 3.6947258621), (14.1091283255, 2.0536621604))
        make_face()
        with BuildLine():
            ThreePointArc((-2.4996713636, -22.2094967991), (-4.678865898, -23.6100705511), (-6.6594189467, -25.2797727028))
            ThreePointArc((-6.6594189467, -25.2797727028), (5.2394725231, -23.5844480112), (15.0267873519, -16.6083307198))
            ThreePointArc((15.0267873519, -16.6083307198), (5.9863881024, -18.5416288768), (-2.4996713636, -22.2094967991))
        make_face()
    extrude(amount=F19_DEPTH)

    # F20
    f20_edges = [f18.edges().sort_by_distance(p)[0] for p in [
        (32.197946, -27.432, -10.398233),
        (-1.722581, -27.432, 25.279773),
    ]]
    fillet(f20_edges, radius=F20_R)


solid = Compound([f1.part, f4.part, f18.part])
